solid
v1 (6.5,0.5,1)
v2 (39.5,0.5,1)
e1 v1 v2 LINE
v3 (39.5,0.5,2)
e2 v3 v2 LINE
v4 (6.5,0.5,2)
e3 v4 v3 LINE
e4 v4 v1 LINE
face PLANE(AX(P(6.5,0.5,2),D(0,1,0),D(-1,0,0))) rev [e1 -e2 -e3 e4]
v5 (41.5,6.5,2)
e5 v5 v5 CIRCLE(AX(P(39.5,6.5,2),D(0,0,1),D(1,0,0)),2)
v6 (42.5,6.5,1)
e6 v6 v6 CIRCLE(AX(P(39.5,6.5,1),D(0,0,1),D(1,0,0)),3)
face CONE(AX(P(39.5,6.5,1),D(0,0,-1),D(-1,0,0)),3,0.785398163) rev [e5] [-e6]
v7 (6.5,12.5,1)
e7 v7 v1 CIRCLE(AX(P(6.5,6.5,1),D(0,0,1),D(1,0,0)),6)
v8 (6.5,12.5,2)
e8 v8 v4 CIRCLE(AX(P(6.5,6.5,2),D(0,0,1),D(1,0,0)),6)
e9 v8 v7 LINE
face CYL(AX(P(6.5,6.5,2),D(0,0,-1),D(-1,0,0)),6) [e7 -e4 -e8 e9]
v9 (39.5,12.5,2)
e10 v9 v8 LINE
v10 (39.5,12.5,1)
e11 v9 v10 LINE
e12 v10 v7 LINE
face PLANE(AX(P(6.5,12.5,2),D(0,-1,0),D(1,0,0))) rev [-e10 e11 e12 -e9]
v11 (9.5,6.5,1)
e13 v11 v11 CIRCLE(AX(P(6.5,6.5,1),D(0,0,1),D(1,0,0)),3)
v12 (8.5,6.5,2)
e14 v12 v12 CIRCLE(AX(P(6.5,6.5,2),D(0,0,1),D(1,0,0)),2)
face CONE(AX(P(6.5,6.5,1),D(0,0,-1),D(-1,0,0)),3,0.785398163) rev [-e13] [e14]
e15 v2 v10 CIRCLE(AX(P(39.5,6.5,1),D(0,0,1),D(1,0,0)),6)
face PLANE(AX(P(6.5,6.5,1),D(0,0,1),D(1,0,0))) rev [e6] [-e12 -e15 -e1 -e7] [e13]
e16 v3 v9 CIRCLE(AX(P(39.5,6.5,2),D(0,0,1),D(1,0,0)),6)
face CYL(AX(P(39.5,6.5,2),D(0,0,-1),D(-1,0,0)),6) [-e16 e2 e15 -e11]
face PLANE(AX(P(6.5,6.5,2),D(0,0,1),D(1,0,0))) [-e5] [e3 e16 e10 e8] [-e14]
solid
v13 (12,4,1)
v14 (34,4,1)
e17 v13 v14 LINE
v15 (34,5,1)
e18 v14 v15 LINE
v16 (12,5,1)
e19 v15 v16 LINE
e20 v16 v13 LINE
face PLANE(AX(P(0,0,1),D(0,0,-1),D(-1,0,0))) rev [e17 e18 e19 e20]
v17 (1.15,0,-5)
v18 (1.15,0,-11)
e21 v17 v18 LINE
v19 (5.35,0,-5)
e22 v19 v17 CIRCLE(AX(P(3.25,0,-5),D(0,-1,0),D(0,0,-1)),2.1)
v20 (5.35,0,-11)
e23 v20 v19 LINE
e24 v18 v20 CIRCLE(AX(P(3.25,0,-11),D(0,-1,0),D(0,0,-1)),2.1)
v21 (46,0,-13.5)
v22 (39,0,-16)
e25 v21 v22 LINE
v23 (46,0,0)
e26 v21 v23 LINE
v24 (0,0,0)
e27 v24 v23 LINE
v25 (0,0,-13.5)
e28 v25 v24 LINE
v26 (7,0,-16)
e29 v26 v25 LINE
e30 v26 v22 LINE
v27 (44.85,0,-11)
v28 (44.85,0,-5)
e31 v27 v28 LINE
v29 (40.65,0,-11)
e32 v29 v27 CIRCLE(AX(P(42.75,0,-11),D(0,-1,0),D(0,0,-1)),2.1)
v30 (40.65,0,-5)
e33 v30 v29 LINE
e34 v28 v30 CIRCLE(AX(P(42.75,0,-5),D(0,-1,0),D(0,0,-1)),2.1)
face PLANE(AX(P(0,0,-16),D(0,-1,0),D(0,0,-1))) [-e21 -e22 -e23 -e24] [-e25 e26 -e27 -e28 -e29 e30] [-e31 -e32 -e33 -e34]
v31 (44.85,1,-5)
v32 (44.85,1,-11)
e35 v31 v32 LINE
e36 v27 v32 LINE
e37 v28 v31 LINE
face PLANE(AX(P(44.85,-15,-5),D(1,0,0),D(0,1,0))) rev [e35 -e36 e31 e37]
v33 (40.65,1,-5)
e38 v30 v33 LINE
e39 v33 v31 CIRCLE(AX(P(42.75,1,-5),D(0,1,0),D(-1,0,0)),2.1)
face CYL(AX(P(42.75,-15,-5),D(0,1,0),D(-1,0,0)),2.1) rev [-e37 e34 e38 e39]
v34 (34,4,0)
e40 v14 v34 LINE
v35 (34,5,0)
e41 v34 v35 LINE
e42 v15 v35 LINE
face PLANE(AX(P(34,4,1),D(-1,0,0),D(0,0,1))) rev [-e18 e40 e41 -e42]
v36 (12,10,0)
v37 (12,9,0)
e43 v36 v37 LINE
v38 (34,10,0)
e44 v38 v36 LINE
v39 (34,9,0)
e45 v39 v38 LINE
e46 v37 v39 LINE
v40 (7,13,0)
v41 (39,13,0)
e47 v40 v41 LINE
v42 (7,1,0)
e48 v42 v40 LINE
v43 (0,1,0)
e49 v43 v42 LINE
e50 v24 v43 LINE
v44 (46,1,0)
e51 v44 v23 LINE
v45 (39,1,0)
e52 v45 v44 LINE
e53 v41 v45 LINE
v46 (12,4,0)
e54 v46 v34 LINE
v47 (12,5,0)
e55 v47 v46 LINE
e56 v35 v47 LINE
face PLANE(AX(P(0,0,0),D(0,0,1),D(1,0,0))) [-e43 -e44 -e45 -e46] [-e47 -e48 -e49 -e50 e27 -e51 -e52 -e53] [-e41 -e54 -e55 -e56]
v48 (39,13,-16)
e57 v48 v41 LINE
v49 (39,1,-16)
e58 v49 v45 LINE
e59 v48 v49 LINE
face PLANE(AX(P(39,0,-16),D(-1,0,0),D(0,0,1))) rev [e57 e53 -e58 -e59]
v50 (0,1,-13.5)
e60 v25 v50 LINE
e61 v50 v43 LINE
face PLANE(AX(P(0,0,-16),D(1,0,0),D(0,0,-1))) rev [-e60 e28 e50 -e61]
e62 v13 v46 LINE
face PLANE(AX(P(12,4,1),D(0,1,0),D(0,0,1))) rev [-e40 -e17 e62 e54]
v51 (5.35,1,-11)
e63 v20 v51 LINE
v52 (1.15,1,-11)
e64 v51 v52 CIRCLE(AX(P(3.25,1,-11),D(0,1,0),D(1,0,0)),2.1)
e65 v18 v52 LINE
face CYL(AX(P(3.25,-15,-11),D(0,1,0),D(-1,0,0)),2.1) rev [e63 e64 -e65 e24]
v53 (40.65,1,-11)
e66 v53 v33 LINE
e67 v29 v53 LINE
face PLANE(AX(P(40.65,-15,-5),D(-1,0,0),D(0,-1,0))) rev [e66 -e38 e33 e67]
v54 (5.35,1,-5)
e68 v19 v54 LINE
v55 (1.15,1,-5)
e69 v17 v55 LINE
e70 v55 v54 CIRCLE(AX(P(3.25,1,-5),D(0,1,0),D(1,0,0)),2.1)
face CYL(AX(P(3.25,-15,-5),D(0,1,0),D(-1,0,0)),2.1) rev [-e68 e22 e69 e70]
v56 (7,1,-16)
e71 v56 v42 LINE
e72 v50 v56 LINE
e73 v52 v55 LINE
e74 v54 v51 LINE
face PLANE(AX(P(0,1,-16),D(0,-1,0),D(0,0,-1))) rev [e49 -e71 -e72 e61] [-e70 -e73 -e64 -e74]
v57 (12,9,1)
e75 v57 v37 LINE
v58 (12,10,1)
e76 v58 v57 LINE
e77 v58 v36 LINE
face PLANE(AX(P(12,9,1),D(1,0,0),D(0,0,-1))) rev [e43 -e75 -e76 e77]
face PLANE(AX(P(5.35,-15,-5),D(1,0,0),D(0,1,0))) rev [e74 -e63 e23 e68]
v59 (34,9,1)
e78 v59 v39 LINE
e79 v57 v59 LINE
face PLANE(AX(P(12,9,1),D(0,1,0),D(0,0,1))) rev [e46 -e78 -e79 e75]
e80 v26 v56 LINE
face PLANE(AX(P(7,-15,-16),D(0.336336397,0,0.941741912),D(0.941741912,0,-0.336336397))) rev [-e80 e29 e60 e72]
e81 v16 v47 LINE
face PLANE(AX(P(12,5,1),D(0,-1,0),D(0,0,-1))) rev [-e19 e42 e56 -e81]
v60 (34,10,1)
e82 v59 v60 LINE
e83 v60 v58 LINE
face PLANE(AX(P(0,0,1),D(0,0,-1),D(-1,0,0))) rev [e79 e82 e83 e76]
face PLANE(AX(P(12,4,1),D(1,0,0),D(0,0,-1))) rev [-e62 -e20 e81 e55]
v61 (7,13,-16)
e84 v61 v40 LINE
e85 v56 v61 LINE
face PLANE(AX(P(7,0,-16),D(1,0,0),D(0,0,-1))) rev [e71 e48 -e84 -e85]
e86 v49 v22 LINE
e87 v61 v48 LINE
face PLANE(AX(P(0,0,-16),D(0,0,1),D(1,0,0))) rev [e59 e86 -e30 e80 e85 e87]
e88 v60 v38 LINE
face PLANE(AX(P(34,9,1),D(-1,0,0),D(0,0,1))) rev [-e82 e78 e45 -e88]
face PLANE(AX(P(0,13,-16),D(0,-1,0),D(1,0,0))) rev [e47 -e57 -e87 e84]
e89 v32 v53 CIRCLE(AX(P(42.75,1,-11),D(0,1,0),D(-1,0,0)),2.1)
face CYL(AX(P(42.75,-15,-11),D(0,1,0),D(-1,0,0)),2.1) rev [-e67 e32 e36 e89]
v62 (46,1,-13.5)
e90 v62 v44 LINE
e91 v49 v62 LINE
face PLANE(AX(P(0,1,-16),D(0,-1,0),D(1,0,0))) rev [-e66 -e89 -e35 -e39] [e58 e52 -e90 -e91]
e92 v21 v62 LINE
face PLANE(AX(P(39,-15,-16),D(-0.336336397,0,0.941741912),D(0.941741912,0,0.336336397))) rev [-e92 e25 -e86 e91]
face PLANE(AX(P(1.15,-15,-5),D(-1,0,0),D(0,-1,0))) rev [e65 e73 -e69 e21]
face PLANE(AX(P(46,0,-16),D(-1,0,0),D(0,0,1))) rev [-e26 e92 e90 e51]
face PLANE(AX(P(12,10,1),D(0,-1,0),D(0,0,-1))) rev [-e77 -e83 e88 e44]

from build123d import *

# Parameters (mm, degrees)
SKETCH_1_W          = 15
SKETCH_1_H          = 12
EXTRUDE_1_DEPTH     = 16
CUT_EXTRUDE_1_DEPTH = 16
CUT_EXTRUDE_2_DEPTH = 16
SKETCH_4_W          = 22
SKETCH_4_H          = 1
EXTRUDE_2_DEPTH     = 1
SKETCH_5_R          = 2
EXTRUDE_3_DEPTH     = 1
CHAMFER_1_SIZE      = 1


with BuildPart() as part:
    # 草图1 → 凸台-拉伸1 (new body)
    with BuildSketch(Plane.XY):
        with Locations((15.5, 6)):
            Rectangle(SKETCH_1_W, SKETCH_1_H)
        with Locations((30.5, 6)):
            Rectangle(SKETCH_1_W, SKETCH_1_H)
        Polygon((0, 1), (0, 0), (8, 0), (8, 12), (23, 12), (23, 13), (7, 13), (7, 1), align=None)
        Polygon((23, 13), (23, 12), (38, 12), (38, 0), (46, 0), (46, 1), (39, 1), (39, 13), align=None)
    extrude(amount=-EXTRUDE_1_DEPTH)

    # 草图2 → 切除-拉伸1 (cut)
    with BuildSketch(Plane(origin=(0, 1, 0), x_dir=(1, 0, 0), z_dir=(0, 1, 0))):
        with BuildLine():
            Line((40.65, 5), (40.65, 11))
            ThreePointArc((40.65, 11), (42.75, 13.1), (44.85, 11))
            Line((44.85, 11), (44.85, 5))
            ThreePointArc((44.85, 5), (42.75, 2.9), (40.65, 5))
        make_face()
        with BuildLine():
            Line((5.35, 5), (5.35, 11))
            ThreePointArc((5.35, 11), (3.25, 13.1), (1.15, 11))
            Line((1.15, 11), (1.15, 5))
            ThreePointArc((1.15, 5), (3.25, 2.9), (5.35, 5))
        make_face()
    extrude(amount=-CUT_EXTRUDE_1_DEPTH, mode=Mode.SUBTRACT)

    # 草图3 → 切除-拉伸2 (cut)
    with BuildSketch(Plane(origin=(0, 1, 0), x_dir=(1, 0, 0), z_dir=(0, 1, 0))):
        Polygon((39, 16), (46, 13.5), (46, 16), align=None)
        Polygon((0, 16), (7, 16), (0, 13.5), align=None)
    extrude(amount=-CUT_EXTRUDE_2_DEPTH, mode=Mode.SUBTRACT)

    # 草图4 → 凸台-拉伸2 (add)
    with BuildSketch(Plane.XY):
        with Locations((23, 9.5)):
            Rectangle(SKETCH_4_W, SKETCH_4_H)
        with Locations((23, 4.5)):
            Rectangle(SKETCH_4_W, SKETCH_4_H)
    extrude(amount=EXTRUDE_2_DEPTH)


with BuildPart() as body_2:
    # 草图5 → 凸台-拉伸3 (new body)
    with BuildSketch(Plane.XY.offset(1)):
        with BuildLine():
            Line((6.5, 12.5), (39.5, 12.5))
            ThreePointArc((39.5, 12.5), (45.5, 6.5), (39.5, 0.5))
            Line((39.5, 0.5), (6.5, 0.5))
            ThreePointArc((6.5, 0.5), (0.5, 6.5), (6.5, 12.5))
        make_face()
        with Locations((6.5, 6.5)):
            Circle(SKETCH_5_R, mode=Mode.SUBTRACT)
        with Locations((39.5, 6.5)):
            Circle(SKETCH_5_R, mode=Mode.SUBTRACT)
    extrude(amount=EXTRUDE_3_DEPTH)

    # 倒角1
    chamfer_1_edges = [body_2.edges().sort_by_distance(p)[0] for p in [
        (4.5, 6.5, 1),
        (37.5, 6.5, 1),
    ]]
    chamfer(chamfer_1_edges, length=CHAMFER_1_SIZE - 0.0001)  # a hair under: the kernel refuses the full size


solid = Compound([part.part, body_2.part])
